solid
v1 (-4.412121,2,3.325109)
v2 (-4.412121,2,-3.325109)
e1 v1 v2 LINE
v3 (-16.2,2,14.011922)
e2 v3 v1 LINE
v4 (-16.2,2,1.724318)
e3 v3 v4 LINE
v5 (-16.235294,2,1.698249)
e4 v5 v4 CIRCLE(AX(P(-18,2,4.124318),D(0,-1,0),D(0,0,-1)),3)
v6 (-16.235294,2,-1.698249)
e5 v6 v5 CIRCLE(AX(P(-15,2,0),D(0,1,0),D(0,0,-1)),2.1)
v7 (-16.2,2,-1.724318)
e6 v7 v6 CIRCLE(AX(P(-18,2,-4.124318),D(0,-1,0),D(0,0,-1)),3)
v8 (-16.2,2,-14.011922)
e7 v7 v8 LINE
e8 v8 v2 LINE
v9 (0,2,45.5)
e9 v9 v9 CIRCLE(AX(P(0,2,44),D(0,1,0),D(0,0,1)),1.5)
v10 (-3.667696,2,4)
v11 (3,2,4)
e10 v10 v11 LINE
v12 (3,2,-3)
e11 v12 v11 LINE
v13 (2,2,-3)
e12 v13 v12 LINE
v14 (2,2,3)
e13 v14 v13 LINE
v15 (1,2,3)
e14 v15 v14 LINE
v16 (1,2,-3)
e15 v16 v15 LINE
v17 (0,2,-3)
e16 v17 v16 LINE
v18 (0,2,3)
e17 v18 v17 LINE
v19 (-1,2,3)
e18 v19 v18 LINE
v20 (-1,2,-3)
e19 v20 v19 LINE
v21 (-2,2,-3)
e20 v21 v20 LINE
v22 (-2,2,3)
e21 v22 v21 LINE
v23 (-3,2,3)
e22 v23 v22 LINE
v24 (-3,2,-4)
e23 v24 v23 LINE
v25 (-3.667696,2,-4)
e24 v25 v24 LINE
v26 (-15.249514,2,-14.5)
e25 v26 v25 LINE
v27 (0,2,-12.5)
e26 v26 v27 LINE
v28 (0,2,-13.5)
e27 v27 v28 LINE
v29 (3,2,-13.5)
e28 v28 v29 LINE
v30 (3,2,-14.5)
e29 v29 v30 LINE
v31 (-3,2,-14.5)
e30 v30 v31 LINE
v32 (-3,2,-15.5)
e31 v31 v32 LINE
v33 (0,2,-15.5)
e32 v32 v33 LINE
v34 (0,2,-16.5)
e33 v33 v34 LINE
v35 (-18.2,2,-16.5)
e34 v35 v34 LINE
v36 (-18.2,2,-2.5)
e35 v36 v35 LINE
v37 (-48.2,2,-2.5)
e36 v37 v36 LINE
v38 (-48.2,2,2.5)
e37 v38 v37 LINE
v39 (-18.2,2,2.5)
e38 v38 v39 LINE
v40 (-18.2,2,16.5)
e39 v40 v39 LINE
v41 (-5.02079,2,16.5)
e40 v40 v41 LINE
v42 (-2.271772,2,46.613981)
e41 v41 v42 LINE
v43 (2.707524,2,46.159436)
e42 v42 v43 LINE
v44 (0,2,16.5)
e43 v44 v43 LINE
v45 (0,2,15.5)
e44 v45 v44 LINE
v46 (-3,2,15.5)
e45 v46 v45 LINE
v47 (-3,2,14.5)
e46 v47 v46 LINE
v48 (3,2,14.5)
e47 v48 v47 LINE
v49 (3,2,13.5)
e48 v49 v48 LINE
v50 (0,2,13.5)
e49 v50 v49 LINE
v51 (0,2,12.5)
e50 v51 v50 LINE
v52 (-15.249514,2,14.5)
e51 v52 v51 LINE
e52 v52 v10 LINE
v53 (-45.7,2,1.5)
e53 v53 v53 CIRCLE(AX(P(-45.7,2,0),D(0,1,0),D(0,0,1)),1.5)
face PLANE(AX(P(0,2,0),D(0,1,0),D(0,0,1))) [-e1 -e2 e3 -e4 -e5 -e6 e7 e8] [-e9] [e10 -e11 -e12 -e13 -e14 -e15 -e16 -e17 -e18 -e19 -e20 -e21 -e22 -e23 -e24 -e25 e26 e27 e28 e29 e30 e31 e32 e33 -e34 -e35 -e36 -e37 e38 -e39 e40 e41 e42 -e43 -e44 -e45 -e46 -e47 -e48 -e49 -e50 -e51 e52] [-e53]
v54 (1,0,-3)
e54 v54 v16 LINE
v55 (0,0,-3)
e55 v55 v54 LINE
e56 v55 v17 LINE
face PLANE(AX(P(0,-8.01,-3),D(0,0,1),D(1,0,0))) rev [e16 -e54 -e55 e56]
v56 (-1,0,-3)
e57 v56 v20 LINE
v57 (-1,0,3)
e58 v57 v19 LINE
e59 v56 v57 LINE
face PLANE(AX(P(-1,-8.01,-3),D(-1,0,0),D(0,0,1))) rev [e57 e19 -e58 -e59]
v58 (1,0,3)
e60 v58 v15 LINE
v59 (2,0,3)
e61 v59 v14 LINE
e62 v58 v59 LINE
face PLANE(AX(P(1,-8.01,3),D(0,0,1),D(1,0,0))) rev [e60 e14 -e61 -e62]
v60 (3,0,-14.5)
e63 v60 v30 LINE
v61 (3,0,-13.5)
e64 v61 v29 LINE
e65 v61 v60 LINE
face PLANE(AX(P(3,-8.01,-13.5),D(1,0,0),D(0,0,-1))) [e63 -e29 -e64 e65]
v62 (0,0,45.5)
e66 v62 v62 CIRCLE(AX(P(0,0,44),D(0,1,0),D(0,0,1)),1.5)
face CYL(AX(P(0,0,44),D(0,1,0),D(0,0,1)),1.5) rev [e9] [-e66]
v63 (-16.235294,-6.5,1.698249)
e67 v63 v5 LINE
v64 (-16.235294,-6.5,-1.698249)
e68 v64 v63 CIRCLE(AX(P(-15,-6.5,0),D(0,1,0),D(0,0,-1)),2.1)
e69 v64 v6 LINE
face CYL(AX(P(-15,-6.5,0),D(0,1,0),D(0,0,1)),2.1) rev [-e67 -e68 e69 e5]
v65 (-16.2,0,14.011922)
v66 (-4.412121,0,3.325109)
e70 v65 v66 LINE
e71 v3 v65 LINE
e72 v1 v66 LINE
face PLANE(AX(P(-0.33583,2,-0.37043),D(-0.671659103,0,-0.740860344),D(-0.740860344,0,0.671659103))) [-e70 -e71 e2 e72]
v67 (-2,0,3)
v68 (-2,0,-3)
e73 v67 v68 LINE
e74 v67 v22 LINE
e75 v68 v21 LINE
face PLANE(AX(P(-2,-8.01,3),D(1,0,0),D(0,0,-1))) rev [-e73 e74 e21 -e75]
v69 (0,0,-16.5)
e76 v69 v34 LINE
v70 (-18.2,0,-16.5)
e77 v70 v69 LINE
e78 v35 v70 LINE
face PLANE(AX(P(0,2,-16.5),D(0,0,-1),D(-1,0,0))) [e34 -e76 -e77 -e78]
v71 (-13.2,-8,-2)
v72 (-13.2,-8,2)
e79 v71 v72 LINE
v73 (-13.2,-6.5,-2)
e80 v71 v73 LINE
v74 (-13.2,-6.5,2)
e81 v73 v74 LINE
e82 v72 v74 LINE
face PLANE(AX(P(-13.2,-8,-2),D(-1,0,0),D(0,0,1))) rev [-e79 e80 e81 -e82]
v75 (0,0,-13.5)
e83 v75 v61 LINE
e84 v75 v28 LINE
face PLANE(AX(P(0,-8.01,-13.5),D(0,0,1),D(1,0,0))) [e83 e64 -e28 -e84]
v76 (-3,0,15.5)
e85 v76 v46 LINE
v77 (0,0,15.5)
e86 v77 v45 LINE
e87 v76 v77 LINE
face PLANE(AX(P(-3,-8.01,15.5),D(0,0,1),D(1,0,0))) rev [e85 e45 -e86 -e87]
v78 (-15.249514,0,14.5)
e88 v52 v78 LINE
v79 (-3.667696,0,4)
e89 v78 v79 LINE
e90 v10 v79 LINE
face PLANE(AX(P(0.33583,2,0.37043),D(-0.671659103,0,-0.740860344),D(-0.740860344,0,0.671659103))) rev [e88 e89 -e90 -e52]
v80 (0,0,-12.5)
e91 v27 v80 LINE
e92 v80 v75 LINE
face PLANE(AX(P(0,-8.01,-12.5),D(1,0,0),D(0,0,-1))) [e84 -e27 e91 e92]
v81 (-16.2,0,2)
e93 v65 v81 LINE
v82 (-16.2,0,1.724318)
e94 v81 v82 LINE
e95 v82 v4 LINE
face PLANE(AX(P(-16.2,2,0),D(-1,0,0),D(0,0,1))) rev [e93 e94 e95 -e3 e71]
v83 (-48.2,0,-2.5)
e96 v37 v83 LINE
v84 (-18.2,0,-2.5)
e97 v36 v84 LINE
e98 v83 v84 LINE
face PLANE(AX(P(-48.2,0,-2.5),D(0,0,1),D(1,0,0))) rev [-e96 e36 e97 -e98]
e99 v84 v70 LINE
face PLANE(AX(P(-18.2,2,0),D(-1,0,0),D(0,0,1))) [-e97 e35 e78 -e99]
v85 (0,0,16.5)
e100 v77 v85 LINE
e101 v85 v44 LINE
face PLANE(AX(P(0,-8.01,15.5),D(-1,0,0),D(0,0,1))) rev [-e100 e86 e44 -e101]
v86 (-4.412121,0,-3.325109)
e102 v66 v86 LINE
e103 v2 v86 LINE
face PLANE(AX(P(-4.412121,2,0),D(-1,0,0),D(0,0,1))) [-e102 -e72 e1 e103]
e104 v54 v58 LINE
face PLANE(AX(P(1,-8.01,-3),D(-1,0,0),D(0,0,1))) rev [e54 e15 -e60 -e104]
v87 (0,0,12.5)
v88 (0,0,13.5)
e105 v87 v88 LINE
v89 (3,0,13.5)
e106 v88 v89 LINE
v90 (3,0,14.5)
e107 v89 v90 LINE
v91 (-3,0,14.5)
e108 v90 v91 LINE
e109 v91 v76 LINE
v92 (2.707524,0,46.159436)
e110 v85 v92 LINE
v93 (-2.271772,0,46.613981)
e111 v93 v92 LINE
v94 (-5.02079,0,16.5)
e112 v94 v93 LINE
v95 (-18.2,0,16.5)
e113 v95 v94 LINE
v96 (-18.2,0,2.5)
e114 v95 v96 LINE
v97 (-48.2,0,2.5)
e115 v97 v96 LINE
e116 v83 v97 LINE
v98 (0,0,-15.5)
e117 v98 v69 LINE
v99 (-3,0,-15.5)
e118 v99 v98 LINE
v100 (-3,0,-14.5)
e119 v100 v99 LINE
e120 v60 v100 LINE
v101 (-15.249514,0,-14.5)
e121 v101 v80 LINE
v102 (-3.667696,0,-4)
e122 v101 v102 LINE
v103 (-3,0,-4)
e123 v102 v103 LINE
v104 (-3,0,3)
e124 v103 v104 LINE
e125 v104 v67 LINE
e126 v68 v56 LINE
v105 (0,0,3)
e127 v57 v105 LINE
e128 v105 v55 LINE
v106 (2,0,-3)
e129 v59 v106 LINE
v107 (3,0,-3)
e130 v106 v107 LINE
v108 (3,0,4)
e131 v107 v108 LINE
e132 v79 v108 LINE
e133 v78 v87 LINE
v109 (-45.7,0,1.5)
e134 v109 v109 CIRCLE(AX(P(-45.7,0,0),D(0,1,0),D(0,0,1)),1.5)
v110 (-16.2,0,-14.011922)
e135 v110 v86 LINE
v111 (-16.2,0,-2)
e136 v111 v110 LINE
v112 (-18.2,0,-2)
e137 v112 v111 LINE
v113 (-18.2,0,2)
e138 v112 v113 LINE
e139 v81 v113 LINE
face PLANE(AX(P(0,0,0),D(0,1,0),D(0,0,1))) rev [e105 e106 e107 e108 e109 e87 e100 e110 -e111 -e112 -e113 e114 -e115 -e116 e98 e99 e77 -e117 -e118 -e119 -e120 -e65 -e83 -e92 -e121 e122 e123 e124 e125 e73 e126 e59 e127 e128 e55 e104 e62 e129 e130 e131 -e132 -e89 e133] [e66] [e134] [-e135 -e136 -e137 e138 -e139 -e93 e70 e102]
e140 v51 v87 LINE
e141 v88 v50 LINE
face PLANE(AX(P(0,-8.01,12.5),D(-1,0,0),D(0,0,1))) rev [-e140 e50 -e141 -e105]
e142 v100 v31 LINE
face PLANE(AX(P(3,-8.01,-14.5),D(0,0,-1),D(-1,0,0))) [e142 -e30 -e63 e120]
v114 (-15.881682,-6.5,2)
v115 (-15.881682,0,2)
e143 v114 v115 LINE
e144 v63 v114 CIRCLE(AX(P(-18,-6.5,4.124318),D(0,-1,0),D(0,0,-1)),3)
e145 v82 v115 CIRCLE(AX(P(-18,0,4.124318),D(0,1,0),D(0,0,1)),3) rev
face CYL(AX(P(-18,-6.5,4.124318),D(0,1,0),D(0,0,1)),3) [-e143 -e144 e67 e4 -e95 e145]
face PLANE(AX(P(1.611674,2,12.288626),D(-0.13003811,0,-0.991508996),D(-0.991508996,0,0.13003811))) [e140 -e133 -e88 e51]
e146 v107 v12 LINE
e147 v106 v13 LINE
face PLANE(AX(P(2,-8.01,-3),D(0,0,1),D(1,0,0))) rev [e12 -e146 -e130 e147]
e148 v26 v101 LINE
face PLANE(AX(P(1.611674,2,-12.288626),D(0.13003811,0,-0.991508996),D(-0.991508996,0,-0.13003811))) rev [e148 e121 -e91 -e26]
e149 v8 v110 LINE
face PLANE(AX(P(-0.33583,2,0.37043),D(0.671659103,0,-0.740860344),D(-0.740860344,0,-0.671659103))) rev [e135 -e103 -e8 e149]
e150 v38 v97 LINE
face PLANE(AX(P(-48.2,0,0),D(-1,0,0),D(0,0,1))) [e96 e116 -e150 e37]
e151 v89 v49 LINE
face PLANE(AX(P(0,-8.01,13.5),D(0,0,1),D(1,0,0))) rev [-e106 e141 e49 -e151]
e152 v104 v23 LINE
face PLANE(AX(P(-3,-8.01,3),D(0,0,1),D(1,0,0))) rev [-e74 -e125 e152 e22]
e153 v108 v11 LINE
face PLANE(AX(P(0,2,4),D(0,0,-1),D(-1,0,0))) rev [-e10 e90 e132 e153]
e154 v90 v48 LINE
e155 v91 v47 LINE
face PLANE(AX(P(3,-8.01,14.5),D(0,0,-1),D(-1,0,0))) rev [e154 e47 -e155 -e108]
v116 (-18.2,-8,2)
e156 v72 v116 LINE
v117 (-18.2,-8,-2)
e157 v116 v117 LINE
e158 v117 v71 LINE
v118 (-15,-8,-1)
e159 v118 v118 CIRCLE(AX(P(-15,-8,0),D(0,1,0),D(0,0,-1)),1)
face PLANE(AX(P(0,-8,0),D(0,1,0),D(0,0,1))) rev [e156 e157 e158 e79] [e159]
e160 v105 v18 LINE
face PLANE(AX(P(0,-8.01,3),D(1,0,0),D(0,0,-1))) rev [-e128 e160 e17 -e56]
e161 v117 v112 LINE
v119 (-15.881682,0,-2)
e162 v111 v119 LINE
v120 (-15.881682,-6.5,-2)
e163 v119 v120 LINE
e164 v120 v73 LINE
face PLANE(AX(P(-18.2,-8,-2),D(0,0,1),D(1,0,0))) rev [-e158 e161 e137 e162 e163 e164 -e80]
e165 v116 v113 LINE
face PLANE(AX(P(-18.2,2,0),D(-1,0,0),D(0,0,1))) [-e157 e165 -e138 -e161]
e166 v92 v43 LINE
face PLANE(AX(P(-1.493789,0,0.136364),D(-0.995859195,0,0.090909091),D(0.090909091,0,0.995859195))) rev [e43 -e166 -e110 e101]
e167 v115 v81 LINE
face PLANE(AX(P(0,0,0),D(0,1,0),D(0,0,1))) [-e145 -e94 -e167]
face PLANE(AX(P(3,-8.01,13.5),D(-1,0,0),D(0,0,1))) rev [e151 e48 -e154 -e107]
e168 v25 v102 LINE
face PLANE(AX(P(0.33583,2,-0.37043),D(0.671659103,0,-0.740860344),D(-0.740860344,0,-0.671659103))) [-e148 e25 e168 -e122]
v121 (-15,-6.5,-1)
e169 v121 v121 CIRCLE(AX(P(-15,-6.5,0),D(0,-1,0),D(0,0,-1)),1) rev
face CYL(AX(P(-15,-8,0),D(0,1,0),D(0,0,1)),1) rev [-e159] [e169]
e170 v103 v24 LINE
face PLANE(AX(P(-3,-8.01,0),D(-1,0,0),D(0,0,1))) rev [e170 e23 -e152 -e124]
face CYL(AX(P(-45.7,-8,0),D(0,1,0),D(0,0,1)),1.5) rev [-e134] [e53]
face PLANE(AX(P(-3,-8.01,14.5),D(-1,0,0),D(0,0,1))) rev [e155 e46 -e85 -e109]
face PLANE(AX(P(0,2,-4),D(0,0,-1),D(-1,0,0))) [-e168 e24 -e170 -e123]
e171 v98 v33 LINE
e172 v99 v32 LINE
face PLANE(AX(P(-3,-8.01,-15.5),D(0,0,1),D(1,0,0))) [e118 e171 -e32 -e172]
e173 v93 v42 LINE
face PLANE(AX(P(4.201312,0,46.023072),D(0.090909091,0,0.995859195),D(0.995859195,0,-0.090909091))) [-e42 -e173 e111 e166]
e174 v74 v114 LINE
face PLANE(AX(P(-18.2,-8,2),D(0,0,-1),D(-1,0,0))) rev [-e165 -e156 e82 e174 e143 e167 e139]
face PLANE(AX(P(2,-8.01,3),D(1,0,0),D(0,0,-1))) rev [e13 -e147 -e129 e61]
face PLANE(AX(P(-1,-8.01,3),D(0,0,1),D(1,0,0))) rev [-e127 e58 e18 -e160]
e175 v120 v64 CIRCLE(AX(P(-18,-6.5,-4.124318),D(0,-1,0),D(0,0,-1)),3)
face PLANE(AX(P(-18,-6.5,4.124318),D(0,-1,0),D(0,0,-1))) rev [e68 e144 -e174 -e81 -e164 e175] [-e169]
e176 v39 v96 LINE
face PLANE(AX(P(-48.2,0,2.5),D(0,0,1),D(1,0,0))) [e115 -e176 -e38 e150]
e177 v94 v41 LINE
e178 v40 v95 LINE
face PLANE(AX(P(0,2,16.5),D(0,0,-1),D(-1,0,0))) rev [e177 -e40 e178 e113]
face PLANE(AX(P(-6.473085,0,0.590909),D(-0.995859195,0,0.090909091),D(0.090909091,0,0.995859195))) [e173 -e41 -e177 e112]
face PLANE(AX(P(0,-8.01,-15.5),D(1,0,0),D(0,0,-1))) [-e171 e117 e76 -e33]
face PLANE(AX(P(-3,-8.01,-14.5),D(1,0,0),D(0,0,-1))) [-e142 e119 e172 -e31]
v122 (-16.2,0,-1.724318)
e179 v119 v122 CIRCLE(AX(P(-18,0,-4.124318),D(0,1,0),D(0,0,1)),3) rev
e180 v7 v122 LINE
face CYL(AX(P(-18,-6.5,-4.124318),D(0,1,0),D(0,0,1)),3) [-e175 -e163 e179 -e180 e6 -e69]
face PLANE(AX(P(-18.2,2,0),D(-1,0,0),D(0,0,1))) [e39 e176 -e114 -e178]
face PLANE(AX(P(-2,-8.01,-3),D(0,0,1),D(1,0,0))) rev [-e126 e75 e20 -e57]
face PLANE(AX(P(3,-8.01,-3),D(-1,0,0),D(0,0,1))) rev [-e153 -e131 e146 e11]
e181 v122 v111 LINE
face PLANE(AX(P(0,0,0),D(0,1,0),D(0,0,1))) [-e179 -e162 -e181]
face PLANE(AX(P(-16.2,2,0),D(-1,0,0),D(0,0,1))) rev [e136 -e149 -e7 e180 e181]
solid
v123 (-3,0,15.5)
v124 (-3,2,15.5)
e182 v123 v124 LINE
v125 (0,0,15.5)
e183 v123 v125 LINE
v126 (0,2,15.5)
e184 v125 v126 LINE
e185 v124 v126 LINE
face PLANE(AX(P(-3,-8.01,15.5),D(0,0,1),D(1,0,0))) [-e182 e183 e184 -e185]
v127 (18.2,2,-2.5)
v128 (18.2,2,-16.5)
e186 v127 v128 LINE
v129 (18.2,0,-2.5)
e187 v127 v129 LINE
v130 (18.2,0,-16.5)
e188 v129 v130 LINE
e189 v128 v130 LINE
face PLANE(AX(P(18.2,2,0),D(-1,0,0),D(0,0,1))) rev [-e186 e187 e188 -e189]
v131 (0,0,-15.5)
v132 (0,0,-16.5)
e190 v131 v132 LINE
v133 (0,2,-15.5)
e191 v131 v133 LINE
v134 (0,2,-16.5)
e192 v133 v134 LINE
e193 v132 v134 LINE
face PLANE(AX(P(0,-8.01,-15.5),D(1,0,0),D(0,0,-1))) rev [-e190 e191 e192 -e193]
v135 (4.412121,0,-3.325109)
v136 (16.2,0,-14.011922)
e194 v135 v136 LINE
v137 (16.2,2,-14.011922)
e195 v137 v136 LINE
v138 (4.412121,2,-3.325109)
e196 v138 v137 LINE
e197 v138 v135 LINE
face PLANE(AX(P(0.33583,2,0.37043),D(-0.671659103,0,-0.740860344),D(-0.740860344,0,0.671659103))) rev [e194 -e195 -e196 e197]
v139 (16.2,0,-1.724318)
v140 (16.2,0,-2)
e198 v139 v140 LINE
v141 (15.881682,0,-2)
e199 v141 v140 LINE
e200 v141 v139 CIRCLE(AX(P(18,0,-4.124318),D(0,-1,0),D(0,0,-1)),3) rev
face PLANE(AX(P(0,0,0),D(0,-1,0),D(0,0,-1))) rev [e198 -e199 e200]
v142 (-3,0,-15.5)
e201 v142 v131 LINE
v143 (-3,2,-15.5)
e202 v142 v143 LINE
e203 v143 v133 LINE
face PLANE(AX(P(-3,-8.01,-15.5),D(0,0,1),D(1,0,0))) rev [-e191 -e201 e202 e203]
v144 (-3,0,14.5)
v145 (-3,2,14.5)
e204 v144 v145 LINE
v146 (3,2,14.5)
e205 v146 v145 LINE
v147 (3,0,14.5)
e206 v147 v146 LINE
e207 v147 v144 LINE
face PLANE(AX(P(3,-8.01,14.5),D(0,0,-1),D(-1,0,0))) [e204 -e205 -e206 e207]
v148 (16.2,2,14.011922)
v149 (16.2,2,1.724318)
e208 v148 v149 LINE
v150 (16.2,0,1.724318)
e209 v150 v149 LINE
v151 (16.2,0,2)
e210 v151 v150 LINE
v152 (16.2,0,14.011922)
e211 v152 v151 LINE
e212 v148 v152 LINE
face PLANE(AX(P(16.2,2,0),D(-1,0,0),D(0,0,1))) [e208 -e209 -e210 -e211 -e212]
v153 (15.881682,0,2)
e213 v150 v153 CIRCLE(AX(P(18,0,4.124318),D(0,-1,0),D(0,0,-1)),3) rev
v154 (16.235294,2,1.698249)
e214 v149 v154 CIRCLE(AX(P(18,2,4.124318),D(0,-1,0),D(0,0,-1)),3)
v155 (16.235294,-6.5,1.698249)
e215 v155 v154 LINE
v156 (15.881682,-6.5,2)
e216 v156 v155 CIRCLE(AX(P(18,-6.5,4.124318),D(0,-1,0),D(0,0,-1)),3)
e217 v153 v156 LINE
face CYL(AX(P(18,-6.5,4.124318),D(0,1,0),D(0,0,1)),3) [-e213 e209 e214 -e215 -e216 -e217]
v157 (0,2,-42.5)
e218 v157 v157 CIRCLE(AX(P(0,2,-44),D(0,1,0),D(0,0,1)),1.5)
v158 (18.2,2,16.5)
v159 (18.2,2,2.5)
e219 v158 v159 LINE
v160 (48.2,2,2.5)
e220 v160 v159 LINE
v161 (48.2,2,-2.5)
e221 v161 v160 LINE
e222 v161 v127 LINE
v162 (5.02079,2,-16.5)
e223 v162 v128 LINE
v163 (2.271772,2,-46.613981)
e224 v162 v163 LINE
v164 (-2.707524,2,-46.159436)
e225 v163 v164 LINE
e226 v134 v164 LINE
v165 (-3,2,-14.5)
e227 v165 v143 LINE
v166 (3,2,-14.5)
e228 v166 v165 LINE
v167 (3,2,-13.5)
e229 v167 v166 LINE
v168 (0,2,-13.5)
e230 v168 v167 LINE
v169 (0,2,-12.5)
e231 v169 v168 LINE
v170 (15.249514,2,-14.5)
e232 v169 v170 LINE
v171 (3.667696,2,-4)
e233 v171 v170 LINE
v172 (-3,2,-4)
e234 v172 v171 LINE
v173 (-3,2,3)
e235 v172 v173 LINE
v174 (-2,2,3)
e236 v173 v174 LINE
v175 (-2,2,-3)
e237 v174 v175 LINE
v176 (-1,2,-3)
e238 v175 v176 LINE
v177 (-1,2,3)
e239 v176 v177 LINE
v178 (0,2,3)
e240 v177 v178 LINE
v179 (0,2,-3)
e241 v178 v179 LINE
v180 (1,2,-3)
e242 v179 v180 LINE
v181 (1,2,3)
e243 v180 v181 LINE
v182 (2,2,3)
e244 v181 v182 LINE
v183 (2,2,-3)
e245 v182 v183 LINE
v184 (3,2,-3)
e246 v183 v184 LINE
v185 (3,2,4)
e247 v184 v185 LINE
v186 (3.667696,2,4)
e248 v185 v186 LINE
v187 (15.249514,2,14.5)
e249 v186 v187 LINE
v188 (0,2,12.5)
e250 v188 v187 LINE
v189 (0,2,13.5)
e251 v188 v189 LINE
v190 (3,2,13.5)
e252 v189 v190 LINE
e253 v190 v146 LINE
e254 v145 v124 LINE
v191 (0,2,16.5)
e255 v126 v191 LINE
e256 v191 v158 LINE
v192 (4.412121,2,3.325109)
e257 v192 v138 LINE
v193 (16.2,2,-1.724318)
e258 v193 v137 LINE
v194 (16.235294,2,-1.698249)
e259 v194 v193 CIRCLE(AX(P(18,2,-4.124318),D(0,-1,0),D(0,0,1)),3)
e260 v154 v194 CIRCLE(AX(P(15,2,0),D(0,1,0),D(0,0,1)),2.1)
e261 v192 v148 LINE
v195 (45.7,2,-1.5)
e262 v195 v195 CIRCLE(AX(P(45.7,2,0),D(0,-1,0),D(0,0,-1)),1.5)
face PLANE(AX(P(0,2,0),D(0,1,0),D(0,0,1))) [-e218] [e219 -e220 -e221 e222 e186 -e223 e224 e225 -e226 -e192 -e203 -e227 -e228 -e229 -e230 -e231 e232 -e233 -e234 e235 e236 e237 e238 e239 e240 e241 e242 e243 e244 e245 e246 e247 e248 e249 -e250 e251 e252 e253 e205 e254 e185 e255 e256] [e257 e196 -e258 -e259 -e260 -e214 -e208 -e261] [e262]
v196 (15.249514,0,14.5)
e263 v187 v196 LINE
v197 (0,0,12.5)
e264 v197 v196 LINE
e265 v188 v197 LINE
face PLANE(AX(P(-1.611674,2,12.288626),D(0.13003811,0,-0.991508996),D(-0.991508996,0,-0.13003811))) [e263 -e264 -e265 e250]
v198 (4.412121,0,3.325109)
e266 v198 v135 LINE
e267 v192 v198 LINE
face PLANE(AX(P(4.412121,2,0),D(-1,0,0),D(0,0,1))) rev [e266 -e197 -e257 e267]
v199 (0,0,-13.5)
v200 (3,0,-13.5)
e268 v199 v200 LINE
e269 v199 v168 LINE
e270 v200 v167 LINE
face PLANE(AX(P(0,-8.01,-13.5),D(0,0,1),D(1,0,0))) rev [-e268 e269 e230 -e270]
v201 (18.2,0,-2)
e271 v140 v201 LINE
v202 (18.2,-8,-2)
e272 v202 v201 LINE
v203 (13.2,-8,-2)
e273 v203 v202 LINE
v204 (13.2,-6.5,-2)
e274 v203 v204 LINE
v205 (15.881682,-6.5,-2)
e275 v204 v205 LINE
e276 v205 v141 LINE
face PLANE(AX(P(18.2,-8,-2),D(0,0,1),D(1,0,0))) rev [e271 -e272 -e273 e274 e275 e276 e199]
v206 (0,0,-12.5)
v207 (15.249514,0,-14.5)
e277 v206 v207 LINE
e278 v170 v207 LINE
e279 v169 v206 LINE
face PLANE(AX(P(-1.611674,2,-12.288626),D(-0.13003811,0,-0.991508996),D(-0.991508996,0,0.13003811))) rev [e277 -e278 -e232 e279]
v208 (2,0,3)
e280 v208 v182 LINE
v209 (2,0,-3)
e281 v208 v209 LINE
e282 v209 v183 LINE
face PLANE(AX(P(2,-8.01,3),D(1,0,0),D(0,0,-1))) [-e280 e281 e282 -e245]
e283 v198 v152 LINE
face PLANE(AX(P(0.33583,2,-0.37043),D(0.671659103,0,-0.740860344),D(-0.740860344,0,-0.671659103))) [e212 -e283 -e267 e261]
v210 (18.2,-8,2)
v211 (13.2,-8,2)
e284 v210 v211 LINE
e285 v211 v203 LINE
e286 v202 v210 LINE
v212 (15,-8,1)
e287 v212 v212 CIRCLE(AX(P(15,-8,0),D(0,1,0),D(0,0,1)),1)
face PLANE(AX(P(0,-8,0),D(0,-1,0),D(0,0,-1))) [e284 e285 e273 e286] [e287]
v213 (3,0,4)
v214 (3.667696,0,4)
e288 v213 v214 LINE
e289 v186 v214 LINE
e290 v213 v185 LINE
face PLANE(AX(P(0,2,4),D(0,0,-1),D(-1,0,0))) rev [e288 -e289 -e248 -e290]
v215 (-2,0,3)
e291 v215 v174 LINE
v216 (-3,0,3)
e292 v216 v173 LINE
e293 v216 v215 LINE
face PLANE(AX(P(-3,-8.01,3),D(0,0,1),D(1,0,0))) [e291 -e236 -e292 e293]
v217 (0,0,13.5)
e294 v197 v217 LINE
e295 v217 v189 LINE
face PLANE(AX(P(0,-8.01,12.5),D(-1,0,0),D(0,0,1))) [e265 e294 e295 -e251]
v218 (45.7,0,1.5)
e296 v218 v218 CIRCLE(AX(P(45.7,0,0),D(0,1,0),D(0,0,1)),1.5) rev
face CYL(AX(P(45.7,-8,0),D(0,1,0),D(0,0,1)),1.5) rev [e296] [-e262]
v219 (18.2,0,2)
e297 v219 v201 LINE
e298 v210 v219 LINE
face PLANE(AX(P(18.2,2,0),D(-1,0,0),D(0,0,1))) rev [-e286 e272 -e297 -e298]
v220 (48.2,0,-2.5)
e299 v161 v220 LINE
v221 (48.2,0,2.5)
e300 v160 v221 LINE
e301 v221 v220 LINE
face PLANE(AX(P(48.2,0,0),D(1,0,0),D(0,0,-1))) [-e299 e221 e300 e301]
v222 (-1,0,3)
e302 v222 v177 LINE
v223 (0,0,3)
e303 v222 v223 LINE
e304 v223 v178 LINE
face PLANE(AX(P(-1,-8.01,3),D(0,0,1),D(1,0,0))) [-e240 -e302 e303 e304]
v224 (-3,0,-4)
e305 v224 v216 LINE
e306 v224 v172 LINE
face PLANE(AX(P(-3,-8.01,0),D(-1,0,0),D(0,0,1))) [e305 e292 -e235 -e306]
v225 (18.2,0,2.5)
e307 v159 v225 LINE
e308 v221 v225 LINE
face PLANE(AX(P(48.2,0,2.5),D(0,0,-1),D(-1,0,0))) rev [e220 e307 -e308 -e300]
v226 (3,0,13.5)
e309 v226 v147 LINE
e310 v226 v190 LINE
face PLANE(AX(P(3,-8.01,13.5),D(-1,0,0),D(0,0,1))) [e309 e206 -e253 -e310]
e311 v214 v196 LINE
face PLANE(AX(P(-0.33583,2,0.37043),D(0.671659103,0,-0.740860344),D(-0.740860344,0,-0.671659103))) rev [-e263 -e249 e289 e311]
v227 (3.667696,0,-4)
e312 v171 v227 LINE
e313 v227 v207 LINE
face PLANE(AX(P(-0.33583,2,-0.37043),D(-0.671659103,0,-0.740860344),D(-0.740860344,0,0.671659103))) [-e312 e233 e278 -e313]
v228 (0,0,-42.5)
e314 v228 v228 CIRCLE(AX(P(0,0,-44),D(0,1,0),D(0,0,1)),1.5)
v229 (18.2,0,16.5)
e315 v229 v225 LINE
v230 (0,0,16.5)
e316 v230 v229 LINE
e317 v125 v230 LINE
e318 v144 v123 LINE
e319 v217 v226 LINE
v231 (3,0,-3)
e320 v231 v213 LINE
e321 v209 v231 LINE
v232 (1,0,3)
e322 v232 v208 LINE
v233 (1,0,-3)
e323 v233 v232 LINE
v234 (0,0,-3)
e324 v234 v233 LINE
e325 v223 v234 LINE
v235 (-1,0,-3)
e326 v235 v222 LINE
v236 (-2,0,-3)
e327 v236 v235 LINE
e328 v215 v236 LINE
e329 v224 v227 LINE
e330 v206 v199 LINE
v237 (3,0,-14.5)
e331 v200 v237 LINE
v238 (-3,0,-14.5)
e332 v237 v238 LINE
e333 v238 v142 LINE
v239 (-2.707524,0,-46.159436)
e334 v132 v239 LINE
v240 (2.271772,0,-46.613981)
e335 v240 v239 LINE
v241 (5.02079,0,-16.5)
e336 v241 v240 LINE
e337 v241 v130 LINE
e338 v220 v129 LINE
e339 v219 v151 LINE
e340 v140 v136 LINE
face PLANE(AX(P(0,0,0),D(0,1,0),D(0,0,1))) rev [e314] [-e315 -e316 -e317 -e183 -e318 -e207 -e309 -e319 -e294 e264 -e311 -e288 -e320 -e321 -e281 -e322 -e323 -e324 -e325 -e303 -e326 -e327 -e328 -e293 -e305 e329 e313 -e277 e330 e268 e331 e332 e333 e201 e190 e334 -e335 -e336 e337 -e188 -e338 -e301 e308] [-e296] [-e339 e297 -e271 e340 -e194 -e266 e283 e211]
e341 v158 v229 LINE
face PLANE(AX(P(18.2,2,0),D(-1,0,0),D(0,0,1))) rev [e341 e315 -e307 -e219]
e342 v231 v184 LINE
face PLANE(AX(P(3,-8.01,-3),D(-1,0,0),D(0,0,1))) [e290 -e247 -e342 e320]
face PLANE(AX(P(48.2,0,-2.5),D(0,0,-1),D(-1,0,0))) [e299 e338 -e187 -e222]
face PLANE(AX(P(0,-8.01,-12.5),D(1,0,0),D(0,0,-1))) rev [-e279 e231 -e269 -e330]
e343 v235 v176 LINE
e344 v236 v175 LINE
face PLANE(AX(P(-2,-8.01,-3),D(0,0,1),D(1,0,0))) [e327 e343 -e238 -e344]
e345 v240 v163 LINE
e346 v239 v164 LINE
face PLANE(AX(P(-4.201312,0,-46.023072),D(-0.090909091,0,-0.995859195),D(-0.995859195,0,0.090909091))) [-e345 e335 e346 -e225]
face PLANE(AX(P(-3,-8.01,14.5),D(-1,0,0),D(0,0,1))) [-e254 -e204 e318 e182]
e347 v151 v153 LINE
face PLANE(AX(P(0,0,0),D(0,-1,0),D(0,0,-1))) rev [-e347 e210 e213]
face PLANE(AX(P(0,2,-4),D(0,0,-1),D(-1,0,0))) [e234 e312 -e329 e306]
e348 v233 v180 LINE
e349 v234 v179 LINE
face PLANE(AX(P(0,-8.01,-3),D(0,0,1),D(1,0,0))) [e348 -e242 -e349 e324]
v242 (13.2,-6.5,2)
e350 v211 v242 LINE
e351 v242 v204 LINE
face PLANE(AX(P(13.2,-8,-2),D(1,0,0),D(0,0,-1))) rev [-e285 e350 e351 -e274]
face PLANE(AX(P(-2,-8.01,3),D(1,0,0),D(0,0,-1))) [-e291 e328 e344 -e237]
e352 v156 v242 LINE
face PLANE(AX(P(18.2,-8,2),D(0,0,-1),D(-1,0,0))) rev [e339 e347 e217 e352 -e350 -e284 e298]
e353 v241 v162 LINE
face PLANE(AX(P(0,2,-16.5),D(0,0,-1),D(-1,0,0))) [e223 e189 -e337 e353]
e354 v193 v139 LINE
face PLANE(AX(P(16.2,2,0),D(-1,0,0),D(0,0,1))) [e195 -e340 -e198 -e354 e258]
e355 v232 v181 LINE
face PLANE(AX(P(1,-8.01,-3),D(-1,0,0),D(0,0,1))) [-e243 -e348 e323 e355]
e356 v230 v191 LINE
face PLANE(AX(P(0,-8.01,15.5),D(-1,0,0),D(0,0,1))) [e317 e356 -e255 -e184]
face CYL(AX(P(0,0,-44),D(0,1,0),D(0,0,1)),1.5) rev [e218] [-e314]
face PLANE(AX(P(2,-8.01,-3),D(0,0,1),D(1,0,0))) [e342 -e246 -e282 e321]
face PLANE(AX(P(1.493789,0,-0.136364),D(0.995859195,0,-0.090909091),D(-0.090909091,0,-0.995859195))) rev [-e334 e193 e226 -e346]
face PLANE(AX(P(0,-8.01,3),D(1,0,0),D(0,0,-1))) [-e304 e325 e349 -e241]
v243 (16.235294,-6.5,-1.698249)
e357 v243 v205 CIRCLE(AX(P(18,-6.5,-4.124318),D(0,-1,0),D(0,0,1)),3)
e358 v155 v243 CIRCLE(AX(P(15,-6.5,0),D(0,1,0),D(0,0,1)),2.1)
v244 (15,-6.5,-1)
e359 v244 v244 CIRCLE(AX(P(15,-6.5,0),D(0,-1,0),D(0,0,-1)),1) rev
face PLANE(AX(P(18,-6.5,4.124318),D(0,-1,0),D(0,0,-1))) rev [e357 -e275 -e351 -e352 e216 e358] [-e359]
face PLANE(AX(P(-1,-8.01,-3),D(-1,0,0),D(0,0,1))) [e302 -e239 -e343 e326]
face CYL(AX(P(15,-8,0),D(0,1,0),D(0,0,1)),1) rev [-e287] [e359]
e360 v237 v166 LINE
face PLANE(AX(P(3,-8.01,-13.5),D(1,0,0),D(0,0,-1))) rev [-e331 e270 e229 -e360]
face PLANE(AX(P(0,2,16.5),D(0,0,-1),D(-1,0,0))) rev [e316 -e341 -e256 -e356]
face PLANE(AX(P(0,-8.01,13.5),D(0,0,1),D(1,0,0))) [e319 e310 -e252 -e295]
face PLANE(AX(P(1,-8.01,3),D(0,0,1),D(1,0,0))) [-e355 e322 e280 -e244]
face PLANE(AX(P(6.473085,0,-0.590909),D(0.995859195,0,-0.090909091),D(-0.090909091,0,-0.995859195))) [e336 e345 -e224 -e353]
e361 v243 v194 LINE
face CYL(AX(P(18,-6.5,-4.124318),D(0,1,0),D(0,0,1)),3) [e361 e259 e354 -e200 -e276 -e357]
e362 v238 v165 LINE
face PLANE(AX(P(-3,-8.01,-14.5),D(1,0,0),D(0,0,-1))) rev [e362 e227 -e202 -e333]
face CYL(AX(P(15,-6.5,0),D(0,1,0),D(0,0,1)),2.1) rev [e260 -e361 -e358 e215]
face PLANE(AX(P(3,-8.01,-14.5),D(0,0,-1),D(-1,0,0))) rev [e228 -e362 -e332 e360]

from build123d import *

# Parameters (mm, degrees)
SKETCH1_W           = 36.4
SKETCH1_H           = 33
BOSS_EXTRUDE1_DEPTH = 2
SKETCH2_W           = 5
SKETCH2_H           = 4
BOSS_EXTRUDE2_DEPTH = 8
SKETCH4_R           = 1
CUT_EXTRUDE2_DEPTH  = 27.162759793
CUT_EXTRUDE1_DEPTH  = 8.5
SKETCH5_W           = 2.5
SKETCH5_H           = 2
BOSS_EXTRUDE3_DEPTH = 30
SKETCH6_W           = 2.5
SKETCH6_H           = 2
BOSS_EXTRUDE4_DEPTH = 30
SKETCH11_R          = 1.5
CUT_EXTRUDE3_DEPTH  = 52.918108594
SKETCH10_R          = 1.5
BOSS_EXTRUDE5_DEPTH = 2
SPLIT2_START        = -16.5
SPLIT2_DEPTH        = 58.9999999
SPLIT2_START_2      = 16.5
SPLIT2_2_OUTLINE_W  = 6
SPLIT2_2_OUTLINE_H  = 2
SPLIT2_2_DEPTH      = 30.113981094
SPLIT2_START_3      = -3
SPLIT2_3_OUTLINE_W  = 1
SPLIT2_3_OUTLINE_H  = 2
SPLIT2_3_DEPTH      = 7
SPLIT2_START_4      = 3
SPLIT2_4_OUTLINE_W  = 3
SPLIT2_4_OUTLINE_H  = 2
SPLIT2_4_DEPTH      = 11.5
SPLIT2_START_5      = -14.5
SPLIT2_5_OUTLINE_W  = 6
SPLIT2_5_OUTLINE_H  = 2
SPLIT2_5_DEPTH      = 1
SPLIT2_6_OUTLINE_W  = 3
SPLIT2_6_OUTLINE_H  = 2
SPLIT2_6_DEPTH      = 1
SPLIT2_START_6      = -13.5
SPLIT2_7_OUTLINE_W  = 3
SPLIT2_7_OUTLINE_H  = 2
SPLIT2_7_DEPTH      = 1
SPLIT2_START_7      = 13.5
SPLIT2_8_OUTLINE_W  = 3
SPLIT2_8_OUTLINE_H  = 2
SPLIT2_8_DEPTH      = 1
SPLIT2_START_8      = 15.5
SPLIT2_9_OUTLINE_W  = 3
SPLIT2_9_OUTLINE_H  = 2
SPLIT2_9_DEPTH      = 1
SPLIT2_10_OUTLINE_W = 1
SPLIT2_10_OUTLINE_H = 2
SPLIT2_10_DEPTH     = 1
SPLIT2_11_OUTLINE_R = 1.5
SPLIT2_11_DEPTH     = 2
SPLIT2_START_9      = -8
SPLIT2_12_DEPTH     = 8
SPLIT2_13_OUTLINE_R = 1
SPLIT2_13_DEPTH     = 1.5


# Read off the part's stored shape, not the designer's step: Split2
with BuildPart() as part:
    # Sketch1 → Boss-Extrude1 (new body)
    with BuildSketch(Plane(origin=(0, 0, 0), x_dir=(1, 0, 0), z_dir=(0, 1, 0))):
        Rectangle(SKETCH1_W, SKETCH1_H)
        Polygon((3.667695956, -4), (15.249514138, -14.5), (0, -12.5), (-15.249514138, -14.5), (-3.667695956, -4), align=None, mode=Mode.SUBTRACT)
        Polygon((-4.412121212, -3.325108971), (-16.2, -14.011922158), (-16.2, 14.011922158), (-4.412121212, 3.325108971), align=None, mode=Mode.SUBTRACT)
        Polygon((-3.667695956, 4), (-15.249514138, 14.5), (0, 12.5), (15.249514138, 14.5), (3.667695956, 4), align=None, mode=Mode.SUBTRACT)
        Polygon((4.412121212, 3.325108971), (16.2, 14.011922158), (16.2, -14.011922158), (4.412121212, -3.325108971), align=None, mode=Mode.SUBTRACT)
    extrude(amount=BOSS_EXTRUDE1_DEPTH)

    # Sketch2 → Boss-Extrude2 (add)
    with BuildSketch(Plane.XZ):
        with Locations((15.7, 0)):
            Rectangle(SKETCH2_W, SKETCH2_H)
        with Locations((-15.7, 0)):
            Rectangle(SKETCH2_W, SKETCH2_H)
    extrude(amount=BOSS_EXTRUDE2_DEPTH)

    # Sketch4 → Cut-Extrude2 (cut, through all)
    with BuildSketch(Plane(origin=(0, 1, 0), x_dir=(1, 0, 0), z_dir=(0, 1, 0))):
        with Locations(Location((15, 0, 0), (0, 0, 270))):
            Circle(SKETCH4_R)
        with Locations(Location((-15, 0, 0), (0, 0, 270))):
            Circle(SKETCH4_R)
    extrude(amount=-CUT_EXTRUDE2_DEPTH, mode=Mode.SUBTRACT)

    # Sketch3 → Cut-Extrude1 (cut)
    with BuildSketch(Plane(origin=(0, 2, 0), x_dir=(1, 0, 0), z_dir=(0, 1, 0))):
        with BuildLine():
            Line((15, 4.124318125), (15, 4.257967602))
            Line((15, 4.257967602), (10.3221916, 4.257967602))
            Line((10.3221916, 4.257967602), (10.3221916, -5.239749404))
            Line((10.3221916, -5.239749404), (15, -5.239749404))
            Line((15, -5.239749404), (15, -4.124318125))
            ThreePointArc((15, -4.124318125), (15.326601634, -2.763090306), (16.235294118, -1.69824864))
            ThreePointArc((16.235294118, -1.69824864), (17.1, 0), (16.235294118, 1.69824864))
            ThreePointArc((16.235294118, 1.69824864), (15.326601634, 2.763090306), (15, 4.124318125))
        make_face()
        with BuildLine():
            Line((-10.3221916, -5.239749404), (-15, -5.239749404))
            Line((-15, -5.239749404), (-15, -4.124318125))
            ThreePointArc((-15, -4.124318125), (-15.326601634, -2.763090306), (-16.235294118, -1.69824864))
            ThreePointArc((-16.235294118, -1.69824864), (-17.1, 0), (-16.235294118, 1.69824864))
            ThreePointArc((-16.235294118, 1.69824864), (-15.326601634, 2.763090306), (-15, 4.124318125))
            Line((-15, 4.124318125), (-15, 4.257967602))
            Line((-15, 4.257967602), (-10.3221916, 4.257967602))
            Line((-10.3221916, 4.257967602), (-10.3221916, -5.239749404))
        make_face()
    extrude(amount=-CUT_EXTRUDE1_DEPTH, mode=Mode.SUBTRACT)

    # Sketch5 → Boss-Extrude3 (add)
    with BuildSketch(Plane.ZY.offset(18.2)):
        with Locations((1.25, 1)):
            Rectangle(SKETCH5_W, SKETCH5_H)
        with Locations((-1.25, 1)):
            Rectangle(SKETCH5_W, SKETCH5_H)
    extrude(amount=BOSS_EXTRUDE3_DEPTH)

    # Sketch6 → Boss-Extrude4 (add)
    with BuildSketch(Plane(origin=(18.2, 0, 0), x_dir=(0, 0, -1), z_dir=(1, 0, 0))):
        with Locations((-1.25, 1)):
            Rectangle(SKETCH6_W, SKETCH6_H)
        with Locations((1.25, 1)):
            Rectangle(SKETCH6_W, SKETCH6_H)
    extrude(amount=BOSS_EXTRUDE4_DEPTH)

    # Sketch11 → Cut-Extrude3 (cut, through all)
    with BuildSketch(Plane(origin=(0, 2, 0), x_dir=(1, 0, 0), z_dir=(0, 1, 0))):
        with Locations(Location((-45.7, 0, 0), (0, 0, 270))):
            Circle(SKETCH11_R)
        with Locations(Location((45.7, 0, 0), (0, 0, 270))):
            Circle(SKETCH11_R)
    extrude(amount=-CUT_EXTRUDE3_DEPTH, mode=Mode.SUBTRACT)

    # Sketch10 → Boss-Extrude5 (add)
    # profile 1 of 2: a face of its own
    with BuildSketch(Plane(origin=(0, 2, 0), x_dir=(1, 0, 0), z_dir=(0, 1, 0))):
        Polygon((0, -16.5), (-5.02079011, -16.5), (-2.27177232, -46.613981094), (2.707523657, -46.15943564), align=None)
        with Locations(Location((0, -44, 0), (0, 0, 270))):
            Circle(SKETCH10_R, mode=Mode.SUBTRACT)
    # profile 2 of 2: a face of its own
    with BuildSketch(Plane(origin=(0, 2, 0), x_dir=(1, 0, 0), z_dir=(0, 1, 0))):
        Polygon((0, 16.5), (5.02079011, 16.5), (2.27177232, 46.613981094), (-2.707523657, 46.15943564), align=None)
        with Locations(Location((0, 44, 0), (0, 0, 270))):
            Circle(SKETCH10_R, mode=Mode.SUBTRACT)
    extrude(amount=-BOSS_EXTRUDE5_DEPTH)

    # Split2 outline → Split2 (cut)
    with BuildSketch(Plane.XY.offset(SPLIT2_START)):
        Polygon((-4.412121212, 0), (-3, 0), (-3, 2), (-48.2, 2), (-48.2, 0), (-18.2, 0), (-18.2, -6.5), (-50, -6.5), (-50, -10), (-4.412121212, -10), align=None)
    extrude(amount=SPLIT2_DEPTH, mode=Mode.SUBTRACT)

    # Split2 2 outline → Split2 2 (cut)
    with BuildSketch(Plane.XY.offset(SPLIT2_START_2)):
        with Locations((0, 1)):
            Rectangle(SPLIT2_2_OUTLINE_W, SPLIT2_2_OUTLINE_H)
    extrude(amount=SPLIT2_2_DEPTH, mode=Mode.SUBTRACT)

    # Split2 3 outline → Split2 3 (cut)
    with BuildSketch(Plane.XY.offset(SPLIT2_START_3)):
        with Locations((0.5, 1)):
            Rectangle(SPLIT2_3_OUTLINE_W, SPLIT2_3_OUTLINE_H)
        with Locations((-1.5, 1)):
            Rectangle(SPLIT2_3_OUTLINE_W, SPLIT2_3_OUTLINE_H)
        with Locations((2.5, 1)):
            Rectangle(SPLIT2_3_OUTLINE_W, SPLIT2_3_OUTLINE_H)
    extrude(amount=SPLIT2_3_DEPTH, mode=Mode.SUBTRACT)

    # Split2 4 outline → Split2 4 (cut)
    with BuildSketch(Plane.XY.offset(SPLIT2_START_4)):
        with Locations((-1.5, 1)):
            Rectangle(SPLIT2_4_OUTLINE_W, SPLIT2_4_OUTLINE_H)
    extrude(amount=SPLIT2_4_DEPTH, mode=Mode.SUBTRACT)

    # Split2 5 outline → Split2 5 (cut)
    with BuildSketch(Plane.XY.offset(SPLIT2_START_5)):
        with Locations((0, 1)):
            Rectangle(SPLIT2_5_OUTLINE_W, SPLIT2_5_OUTLINE_H)
    extrude(amount=SPLIT2_5_DEPTH, mode=Mode.SUBTRACT)

    # Split2 6 outline → Split2 6 (cut)
    with BuildSketch(Plane.XY.offset(SPLIT2_START)):
        with Locations((-1.5, 1)):
            Rectangle(SPLIT2_6_OUTLINE_W, SPLIT2_6_OUTLINE_H)
    extrude(amount=SPLIT2_6_DEPTH, mode=Mode.SUBTRACT)

    # Split2 7 outline → Split2 7 (cut)
    with BuildSketch(Plane.XY.offset(SPLIT2_START_6)):
        with Locations((-1.5, 1)):
            Rectangle(SPLIT2_7_OUTLINE_W, SPLIT2_7_OUTLINE_H)
    extrude(amount=SPLIT2_7_DEPTH, mode=Mode.SUBTRACT)

    # Split2 8 outline → Split2 8 (cut)
    with BuildSketch(Plane.XY.offset(SPLIT2_START_7)):
        with Locations((1.5, 1)):
            Rectangle(SPLIT2_8_OUTLINE_W, SPLIT2_8_OUTLINE_H)
    extrude(amount=SPLIT2_8_DEPTH, mode=Mode.SUBTRACT)

    # Split2 9 outline → Split2 9 (cut)
    with BuildSketch(Plane.XY.offset(SPLIT2_START_8)):
        with Locations((-1.5, 1)):
            Rectangle(SPLIT2_9_OUTLINE_W, SPLIT2_9_OUTLINE_H)
    extrude(amount=SPLIT2_9_DEPTH, mode=Mode.SUBTRACT)

    # Split2 10 outline → Split2 10 (cut)
    with BuildSketch(Plane.XY.offset(SPLIT2_START_4)):
        with Locations((1.5, 1)):
            Rectangle(SPLIT2_10_OUTLINE_W, SPLIT2_10_OUTLINE_H)
    extrude(amount=SPLIT2_10_DEPTH, mode=Mode.SUBTRACT)


with BuildPart() as body_2:
    # Split2 11 outline → Split2 11 (new body)
    with BuildSketch(Plane(origin=(0, 0, 0), x_dir=(1, 0, 0), z_dir=(0, 1, 0))):
        Polygon((3, -4), (3, 3), (2, 3), (2, -3), (1, -3), (1, 3), (0, 3), (0, -3), (-1, -3), (-1, 3), (-2, 3), (-2, -3), (-3, -3), (-3, 4), (-3.667695956, 4), (-15.249514138, 14.5), (0, 12.5), (0, 13.5), (3, 13.5), (3, 14.5), (-3, 14.5), (-3, 15.5), (0, 15.5), (0, 16.5), (-18.2, 16.5), (-18.2, 2.5), (-48.2, 2.5), (-48.2, -2.5), (-18.2, -2.5), (-18.2, -16.5), (-5.02079011, -16.5), (-2.27177232, -46.613981094), (2.707523657, -46.15943564), (0, -16.5), (0, -15.5), (-3, -15.5), (-3, -14.5), (3, -14.5), (3, -13.5), (0, -13.5), (0, -12.5), (-15.249514138, -14.5), (-3.667695956, -4), align=None)
        with BuildLine():
            Line((-4.412121212, -3.325108971), (-16.2, -14.011922158))
            Line((-16.2, -14.011922158), (-16.2, -1.724318125))
            ThreePointArc((-16.2, -1.724318125), (-16.217599397, -1.711218855), (-16.235294118, -1.69824864))
            ThreePointArc((-16.235294118, -1.69824864), (-17.1, 0), (-16.235294118, 1.69824864))
            ThreePointArc((-16.235294118, 1.69824864), (-16.217599397, 1.711218855), (-16.2, 1.724318125))
            Line((-16.2, 1.724318125), (-16.2, 14.011922158))
            Line((-16.2, 14.011922158), (-4.412121212, 3.325108971))
            Line((-4.412121212, 3.325108971), (-4.412121212, -3.325108971))
        make_face(mode=Mode.SUBTRACT)
        with Locations((0, -44)):
            Circle(SPLIT2_11_OUTLINE_R, mode=Mode.SUBTRACT)
        with Locations((-45.7, 0)):
            Circle(SPLIT2_11_OUTLINE_R, mode=Mode.SUBTRACT)
    extrude(amount=SPLIT2_11_DEPTH)

    # Split2 12 outline → Split2 12 (add)
    with BuildSketch(Plane(origin=(0, 0, 0), x_dir=(1, 0, 0), z_dir=(0, 1, 0)).offset(SPLIT2_START_9)):
        with BuildLine():
            ThreePointArc((-15.881681681, -2), (-16.052634418, -1.842264819), (-16.235294118, -1.69824864))
            ThreePointArc((-16.235294118, -1.69824864), (-17.1, 0), (-16.235294118, 1.69824864))
            ThreePointArc((-16.235294118, 1.69824864), (-16.052634418, 1.842264819), (-15.881681681, 2))
            Line((-15.881681681, 2), (-18.2, 2))
            Line((-18.2, 2), (-18.2, -2))
            Line((-18.2, -2), (-15.881681681, -2))
        make_face()
    extrude(amount=SPLIT2_12_DEPTH)

    # Split2 13 outline → Split2 13 (add)
    with BuildSketch(Plane(origin=(0, 0, 0), x_dir=(1, 0, 0), z_dir=(0, 1, 0)).offset(SPLIT2_START_9)):
        with BuildLine():
            Line((-15.881681681, -2), (-13.2, -2))
            Line((-13.2, -2), (-13.2, 2))
            Line((-13.2, 2), (-15.881681681, 2))
            ThreePointArc((-15.881681681, 2), (-16.052634418, 1.842264819), (-16.235294118, 1.69824864))
            ThreePointArc((-16.235294118, 1.69824864), (-17.1, 0), (-16.235294118, -1.69824864))
            ThreePointArc((-16.235294118, -1.69824864), (-16.052634418, -1.842264819), (-15.881681681, -2))
        make_face()
        with Locations((-15, 0)):
            Circle(SPLIT2_13_OUTLINE_R, mode=Mode.SUBTRACT)
    extrude(amount=SPLIT2_13_DEPTH)


solid = Compound([part.part, body_2.part])
